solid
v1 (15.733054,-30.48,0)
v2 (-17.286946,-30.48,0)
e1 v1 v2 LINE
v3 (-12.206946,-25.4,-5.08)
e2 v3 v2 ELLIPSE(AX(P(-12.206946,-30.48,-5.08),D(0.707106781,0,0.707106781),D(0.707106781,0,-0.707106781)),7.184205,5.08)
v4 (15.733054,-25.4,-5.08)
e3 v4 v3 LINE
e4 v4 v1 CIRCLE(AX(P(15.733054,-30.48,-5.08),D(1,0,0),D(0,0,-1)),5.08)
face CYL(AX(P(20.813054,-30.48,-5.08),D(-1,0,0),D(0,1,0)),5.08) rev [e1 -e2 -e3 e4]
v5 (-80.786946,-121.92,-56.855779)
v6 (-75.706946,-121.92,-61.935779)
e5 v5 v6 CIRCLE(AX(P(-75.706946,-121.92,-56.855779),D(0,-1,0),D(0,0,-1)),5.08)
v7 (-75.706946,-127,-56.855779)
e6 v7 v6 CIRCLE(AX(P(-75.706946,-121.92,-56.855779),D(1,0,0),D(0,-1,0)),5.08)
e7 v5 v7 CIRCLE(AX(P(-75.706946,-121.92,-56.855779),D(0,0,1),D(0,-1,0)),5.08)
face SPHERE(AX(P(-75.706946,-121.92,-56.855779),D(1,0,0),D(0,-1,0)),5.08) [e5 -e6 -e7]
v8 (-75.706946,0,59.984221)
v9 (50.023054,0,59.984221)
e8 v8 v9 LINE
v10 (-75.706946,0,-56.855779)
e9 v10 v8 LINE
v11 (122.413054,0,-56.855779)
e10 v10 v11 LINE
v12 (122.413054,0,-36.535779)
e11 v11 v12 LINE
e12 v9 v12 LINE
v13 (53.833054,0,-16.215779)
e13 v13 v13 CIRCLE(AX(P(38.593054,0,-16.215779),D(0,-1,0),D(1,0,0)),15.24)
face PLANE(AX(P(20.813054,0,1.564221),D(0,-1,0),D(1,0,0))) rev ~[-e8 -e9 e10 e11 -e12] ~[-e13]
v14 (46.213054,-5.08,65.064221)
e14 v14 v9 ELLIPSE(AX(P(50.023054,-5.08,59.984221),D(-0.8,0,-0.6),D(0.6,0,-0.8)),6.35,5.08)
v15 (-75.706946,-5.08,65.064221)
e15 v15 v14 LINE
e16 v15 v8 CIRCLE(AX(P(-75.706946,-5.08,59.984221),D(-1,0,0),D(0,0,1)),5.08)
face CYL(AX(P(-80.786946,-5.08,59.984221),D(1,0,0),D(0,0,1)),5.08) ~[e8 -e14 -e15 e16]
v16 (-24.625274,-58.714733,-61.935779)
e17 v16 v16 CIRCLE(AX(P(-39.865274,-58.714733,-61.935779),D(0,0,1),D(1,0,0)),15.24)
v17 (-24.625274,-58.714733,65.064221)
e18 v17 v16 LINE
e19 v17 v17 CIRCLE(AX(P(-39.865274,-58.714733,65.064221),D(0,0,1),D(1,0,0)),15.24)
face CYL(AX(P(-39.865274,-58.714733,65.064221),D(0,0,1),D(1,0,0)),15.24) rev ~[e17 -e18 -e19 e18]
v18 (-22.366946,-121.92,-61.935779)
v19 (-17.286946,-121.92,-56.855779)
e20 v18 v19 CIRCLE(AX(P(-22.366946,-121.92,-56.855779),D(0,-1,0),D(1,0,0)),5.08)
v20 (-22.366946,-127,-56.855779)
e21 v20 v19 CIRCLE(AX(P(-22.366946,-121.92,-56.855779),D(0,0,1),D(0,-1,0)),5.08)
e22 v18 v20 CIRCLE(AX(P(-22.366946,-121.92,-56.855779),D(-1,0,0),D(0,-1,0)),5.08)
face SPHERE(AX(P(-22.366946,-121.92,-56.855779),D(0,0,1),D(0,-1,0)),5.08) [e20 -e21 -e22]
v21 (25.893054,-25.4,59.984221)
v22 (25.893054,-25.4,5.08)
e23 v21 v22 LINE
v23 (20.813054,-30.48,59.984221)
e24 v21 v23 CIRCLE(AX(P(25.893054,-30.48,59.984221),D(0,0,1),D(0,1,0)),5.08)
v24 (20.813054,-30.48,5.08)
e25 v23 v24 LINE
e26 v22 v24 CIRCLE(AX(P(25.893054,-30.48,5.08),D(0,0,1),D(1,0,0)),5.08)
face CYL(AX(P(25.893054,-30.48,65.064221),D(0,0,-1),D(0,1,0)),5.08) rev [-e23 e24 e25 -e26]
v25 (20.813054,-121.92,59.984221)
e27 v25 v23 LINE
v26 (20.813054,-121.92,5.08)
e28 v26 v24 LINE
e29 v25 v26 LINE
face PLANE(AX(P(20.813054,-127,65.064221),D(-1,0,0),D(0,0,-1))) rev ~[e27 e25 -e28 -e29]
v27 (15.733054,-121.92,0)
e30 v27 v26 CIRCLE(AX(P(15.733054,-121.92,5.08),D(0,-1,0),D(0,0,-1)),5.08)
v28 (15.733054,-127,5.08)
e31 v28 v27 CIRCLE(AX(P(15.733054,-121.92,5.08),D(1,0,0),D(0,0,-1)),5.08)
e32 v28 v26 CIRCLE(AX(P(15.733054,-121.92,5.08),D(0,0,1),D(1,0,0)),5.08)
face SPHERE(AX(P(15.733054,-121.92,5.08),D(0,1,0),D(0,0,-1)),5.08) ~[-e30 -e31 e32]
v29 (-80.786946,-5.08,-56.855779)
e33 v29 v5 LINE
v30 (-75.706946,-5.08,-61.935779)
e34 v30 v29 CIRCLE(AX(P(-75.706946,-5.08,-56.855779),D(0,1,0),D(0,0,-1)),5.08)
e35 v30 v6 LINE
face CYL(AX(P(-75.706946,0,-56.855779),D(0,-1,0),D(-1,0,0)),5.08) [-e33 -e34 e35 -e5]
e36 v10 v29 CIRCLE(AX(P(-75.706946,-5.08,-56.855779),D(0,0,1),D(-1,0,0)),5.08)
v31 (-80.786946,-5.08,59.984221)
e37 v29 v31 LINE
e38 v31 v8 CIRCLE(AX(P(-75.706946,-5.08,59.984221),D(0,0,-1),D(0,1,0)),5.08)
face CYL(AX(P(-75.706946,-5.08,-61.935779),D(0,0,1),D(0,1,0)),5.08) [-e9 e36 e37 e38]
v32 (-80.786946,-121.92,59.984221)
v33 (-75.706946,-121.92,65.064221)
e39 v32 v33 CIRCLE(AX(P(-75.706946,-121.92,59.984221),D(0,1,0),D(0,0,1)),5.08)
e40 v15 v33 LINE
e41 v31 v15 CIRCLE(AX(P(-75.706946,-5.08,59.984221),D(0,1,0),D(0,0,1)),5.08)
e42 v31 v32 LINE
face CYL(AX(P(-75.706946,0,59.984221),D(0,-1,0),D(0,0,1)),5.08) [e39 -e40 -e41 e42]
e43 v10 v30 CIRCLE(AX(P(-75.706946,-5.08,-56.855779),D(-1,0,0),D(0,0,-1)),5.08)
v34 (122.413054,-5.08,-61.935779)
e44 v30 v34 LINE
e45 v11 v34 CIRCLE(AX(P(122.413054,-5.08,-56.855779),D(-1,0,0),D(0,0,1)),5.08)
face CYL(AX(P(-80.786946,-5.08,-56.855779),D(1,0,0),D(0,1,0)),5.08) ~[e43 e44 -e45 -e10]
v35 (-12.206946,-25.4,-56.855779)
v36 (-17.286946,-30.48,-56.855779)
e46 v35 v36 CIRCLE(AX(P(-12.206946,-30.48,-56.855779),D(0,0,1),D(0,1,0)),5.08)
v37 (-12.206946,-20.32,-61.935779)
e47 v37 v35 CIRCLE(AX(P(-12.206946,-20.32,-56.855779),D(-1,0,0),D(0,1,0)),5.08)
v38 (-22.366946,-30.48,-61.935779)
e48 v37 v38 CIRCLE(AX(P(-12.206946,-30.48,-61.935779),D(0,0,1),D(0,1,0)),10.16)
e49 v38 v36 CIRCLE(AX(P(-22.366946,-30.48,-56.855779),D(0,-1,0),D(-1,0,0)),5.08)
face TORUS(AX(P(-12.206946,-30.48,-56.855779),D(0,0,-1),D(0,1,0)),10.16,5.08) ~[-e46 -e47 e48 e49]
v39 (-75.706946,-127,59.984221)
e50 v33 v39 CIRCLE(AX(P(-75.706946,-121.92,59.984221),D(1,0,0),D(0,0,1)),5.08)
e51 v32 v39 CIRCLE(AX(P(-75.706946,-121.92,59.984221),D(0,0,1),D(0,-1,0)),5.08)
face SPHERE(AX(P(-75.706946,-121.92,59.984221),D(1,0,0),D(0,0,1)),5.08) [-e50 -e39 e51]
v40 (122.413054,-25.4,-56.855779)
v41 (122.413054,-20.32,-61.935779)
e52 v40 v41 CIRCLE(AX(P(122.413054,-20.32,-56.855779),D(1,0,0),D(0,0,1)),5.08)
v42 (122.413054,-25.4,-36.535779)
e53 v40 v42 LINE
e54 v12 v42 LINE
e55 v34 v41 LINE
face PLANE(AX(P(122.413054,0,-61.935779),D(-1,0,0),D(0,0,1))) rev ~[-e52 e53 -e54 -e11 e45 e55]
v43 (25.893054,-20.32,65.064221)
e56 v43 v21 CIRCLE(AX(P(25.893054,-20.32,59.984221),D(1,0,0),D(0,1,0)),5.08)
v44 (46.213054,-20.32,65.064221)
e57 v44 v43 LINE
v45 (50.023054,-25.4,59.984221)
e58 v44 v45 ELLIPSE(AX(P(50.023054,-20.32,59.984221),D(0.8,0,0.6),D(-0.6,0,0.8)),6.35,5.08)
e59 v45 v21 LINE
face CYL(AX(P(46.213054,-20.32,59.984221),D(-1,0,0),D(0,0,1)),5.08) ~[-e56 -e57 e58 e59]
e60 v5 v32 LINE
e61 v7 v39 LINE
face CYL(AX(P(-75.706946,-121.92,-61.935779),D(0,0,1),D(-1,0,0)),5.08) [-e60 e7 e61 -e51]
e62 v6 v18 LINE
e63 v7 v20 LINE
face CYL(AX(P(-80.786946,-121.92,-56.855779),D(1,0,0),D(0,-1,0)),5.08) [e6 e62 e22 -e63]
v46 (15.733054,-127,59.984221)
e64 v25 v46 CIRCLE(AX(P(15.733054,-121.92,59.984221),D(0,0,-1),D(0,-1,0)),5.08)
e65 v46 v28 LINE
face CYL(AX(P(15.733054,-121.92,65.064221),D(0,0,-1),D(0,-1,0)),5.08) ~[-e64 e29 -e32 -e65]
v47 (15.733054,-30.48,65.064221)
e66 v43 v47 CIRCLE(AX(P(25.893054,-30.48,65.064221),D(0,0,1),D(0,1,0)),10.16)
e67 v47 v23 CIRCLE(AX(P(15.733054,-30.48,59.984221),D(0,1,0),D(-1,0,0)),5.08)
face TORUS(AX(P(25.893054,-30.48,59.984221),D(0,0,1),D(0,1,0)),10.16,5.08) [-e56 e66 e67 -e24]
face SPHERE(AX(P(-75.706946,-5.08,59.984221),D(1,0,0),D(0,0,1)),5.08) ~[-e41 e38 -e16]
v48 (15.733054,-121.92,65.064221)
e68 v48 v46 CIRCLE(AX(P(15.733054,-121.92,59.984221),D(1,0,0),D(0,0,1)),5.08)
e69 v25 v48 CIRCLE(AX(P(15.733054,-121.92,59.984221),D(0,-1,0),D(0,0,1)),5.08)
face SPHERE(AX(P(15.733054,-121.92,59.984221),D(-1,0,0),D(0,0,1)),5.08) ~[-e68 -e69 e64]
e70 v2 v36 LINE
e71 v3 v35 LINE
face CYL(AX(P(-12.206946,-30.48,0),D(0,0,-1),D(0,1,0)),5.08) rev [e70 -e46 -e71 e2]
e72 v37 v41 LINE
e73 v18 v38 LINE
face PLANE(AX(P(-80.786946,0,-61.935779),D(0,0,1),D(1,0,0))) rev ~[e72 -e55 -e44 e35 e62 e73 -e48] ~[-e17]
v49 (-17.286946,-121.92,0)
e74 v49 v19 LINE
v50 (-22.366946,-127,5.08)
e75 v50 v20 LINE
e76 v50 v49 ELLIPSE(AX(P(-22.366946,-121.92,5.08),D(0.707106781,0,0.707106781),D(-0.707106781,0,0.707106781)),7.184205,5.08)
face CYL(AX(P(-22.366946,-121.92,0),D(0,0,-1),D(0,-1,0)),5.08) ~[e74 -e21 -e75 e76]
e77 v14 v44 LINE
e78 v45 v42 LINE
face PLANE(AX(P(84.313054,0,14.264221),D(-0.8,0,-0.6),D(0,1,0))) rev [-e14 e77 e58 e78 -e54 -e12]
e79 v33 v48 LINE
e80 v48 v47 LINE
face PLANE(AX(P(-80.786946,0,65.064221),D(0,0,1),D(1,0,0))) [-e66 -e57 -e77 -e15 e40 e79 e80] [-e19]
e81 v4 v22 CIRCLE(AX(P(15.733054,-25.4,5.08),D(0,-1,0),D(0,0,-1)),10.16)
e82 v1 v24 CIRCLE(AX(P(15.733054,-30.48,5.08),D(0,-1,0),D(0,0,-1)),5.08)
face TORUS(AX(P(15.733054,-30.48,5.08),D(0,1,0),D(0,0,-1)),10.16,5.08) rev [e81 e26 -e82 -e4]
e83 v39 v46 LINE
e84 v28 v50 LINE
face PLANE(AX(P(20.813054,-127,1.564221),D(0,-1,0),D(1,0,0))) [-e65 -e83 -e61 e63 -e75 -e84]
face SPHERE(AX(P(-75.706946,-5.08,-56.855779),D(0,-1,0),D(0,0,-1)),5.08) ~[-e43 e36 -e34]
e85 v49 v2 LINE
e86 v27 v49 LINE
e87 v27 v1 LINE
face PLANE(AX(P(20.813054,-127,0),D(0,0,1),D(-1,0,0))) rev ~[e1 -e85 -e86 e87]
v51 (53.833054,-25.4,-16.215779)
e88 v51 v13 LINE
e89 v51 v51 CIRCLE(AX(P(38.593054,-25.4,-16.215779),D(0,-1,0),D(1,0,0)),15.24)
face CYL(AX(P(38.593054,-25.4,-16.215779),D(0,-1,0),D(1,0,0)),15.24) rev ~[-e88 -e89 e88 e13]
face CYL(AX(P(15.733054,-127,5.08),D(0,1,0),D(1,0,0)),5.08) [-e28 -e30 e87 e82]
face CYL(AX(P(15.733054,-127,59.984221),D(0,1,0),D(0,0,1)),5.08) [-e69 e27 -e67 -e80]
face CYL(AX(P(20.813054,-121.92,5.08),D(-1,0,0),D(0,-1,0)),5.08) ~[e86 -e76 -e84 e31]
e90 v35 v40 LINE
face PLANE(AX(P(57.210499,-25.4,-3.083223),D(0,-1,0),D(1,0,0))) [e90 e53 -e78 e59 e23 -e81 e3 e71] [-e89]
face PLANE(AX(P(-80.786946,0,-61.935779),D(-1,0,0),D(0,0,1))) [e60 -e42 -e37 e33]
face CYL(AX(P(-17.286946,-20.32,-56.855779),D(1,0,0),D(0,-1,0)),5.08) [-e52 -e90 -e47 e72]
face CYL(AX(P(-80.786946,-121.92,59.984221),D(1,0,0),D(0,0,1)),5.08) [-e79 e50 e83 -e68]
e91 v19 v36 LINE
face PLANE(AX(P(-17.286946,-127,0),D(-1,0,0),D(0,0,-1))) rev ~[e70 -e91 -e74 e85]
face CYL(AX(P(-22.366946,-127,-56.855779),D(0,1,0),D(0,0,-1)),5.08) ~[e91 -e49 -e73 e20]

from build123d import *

# Parameters (mm, degrees)
F0_W     = 203.2
F0_H     = 127
F1_DEPTH = 127
F3_DEPTH = 101.6
F4_SIZE2 = 101.6
F4_SIZE  = 76.2
F5_R     = 5.08
F6_R     = 15.24
F7_DEPTH = 1270
F8_R     = 15.24
F9_DEPTH = 12903.2


with BuildPart() as f1:
    # F0 (on Front) → F1 (new body)
    with BuildSketch(Plane.XZ):
        with Locations((20.8130544846, 1.564221409)):
            Rectangle(F0_W, F0_H)
    extrude(amount=F1_DEPTH)

    # F2 (on face) → F3 (cut)
    with BuildSketch(Plane.XZ.offset(127)):
        Polygon((122.4130544846, 65.064221409), (20.8130544846, 65.064221409), (20.8130544846, 0), (-17.2869455154, 0), (-17.2869455154, -61.935778591), (122.4130544846, -61.935778591), align=None)
    extrude(amount=-F3_DEPTH, mode=Mode.SUBTRACT)

    # F4
    f4_edges = [f1.edges().sort_by_distance(p)[0] for p in [
        (122.413054, -12.7, 65.064221),
    ]]
    f4_side = f1.faces().sort_by_distance((-13.053612, -55.033333, 65.064221))[0]
    chamfer(f4_edges, length=F4_SIZE, length2=F4_SIZE2, reference=f4_side)

    # F5
    f5_edges = [f1.edges().sort_by_distance(p)[0] for p in [
        (-29.986946, -127, 65.064221),
        (20.813054, -76.2, 65.064221),
        (20.813054, -25.4, 32.532111),
        (20.813054, -76.2, 0),
        (1.763054, -127, 0),
        (20.813054, -127, 32.532111),
        (-17.286946, -127, -30.967889),
        (-49.036946, -127, -61.935779),
        (-17.286946, -76.2, -61.935779),
        (-17.286946, -25.4, -30.967889),
        (-17.286946, 0, 65.064221),
        (-80.786946, -63.5, 65.064221),
        (-80.786946, -127, 1.564221),
        (-80.786946, -63.5, -61.935779),
        (20.813054, 0, -61.935779),
        (-80.786946, 0, 1.564221),
        (52.563054, -25.4, -61.935779),
        (33.513054, -25.4, 65.064221),
        (1.763054, -25.4, 0),
    ]]
    fillet(f5_edges, radius=F5_R)

    # F6 (on face) → F7 (cut)
    with BuildSketch(Plane.XZ.offset(25.4)):
        with Locations((38.5930544846, -16.215778591)):
            Circle(F6_R)
    extrude(amount=-F7_DEPTH, mode=Mode.SUBTRACT)

    # F8 (on face) → F9 (cut)
    with BuildSketch(Plane.XY.offset(65.064221409)):
        with Locations((-39.8652739823, -58.7147325277)):
            Circle(F8_R)
    extrude(amount=-F9_DEPTH, mode=Mode.SUBTRACT)


solid = f1.part
